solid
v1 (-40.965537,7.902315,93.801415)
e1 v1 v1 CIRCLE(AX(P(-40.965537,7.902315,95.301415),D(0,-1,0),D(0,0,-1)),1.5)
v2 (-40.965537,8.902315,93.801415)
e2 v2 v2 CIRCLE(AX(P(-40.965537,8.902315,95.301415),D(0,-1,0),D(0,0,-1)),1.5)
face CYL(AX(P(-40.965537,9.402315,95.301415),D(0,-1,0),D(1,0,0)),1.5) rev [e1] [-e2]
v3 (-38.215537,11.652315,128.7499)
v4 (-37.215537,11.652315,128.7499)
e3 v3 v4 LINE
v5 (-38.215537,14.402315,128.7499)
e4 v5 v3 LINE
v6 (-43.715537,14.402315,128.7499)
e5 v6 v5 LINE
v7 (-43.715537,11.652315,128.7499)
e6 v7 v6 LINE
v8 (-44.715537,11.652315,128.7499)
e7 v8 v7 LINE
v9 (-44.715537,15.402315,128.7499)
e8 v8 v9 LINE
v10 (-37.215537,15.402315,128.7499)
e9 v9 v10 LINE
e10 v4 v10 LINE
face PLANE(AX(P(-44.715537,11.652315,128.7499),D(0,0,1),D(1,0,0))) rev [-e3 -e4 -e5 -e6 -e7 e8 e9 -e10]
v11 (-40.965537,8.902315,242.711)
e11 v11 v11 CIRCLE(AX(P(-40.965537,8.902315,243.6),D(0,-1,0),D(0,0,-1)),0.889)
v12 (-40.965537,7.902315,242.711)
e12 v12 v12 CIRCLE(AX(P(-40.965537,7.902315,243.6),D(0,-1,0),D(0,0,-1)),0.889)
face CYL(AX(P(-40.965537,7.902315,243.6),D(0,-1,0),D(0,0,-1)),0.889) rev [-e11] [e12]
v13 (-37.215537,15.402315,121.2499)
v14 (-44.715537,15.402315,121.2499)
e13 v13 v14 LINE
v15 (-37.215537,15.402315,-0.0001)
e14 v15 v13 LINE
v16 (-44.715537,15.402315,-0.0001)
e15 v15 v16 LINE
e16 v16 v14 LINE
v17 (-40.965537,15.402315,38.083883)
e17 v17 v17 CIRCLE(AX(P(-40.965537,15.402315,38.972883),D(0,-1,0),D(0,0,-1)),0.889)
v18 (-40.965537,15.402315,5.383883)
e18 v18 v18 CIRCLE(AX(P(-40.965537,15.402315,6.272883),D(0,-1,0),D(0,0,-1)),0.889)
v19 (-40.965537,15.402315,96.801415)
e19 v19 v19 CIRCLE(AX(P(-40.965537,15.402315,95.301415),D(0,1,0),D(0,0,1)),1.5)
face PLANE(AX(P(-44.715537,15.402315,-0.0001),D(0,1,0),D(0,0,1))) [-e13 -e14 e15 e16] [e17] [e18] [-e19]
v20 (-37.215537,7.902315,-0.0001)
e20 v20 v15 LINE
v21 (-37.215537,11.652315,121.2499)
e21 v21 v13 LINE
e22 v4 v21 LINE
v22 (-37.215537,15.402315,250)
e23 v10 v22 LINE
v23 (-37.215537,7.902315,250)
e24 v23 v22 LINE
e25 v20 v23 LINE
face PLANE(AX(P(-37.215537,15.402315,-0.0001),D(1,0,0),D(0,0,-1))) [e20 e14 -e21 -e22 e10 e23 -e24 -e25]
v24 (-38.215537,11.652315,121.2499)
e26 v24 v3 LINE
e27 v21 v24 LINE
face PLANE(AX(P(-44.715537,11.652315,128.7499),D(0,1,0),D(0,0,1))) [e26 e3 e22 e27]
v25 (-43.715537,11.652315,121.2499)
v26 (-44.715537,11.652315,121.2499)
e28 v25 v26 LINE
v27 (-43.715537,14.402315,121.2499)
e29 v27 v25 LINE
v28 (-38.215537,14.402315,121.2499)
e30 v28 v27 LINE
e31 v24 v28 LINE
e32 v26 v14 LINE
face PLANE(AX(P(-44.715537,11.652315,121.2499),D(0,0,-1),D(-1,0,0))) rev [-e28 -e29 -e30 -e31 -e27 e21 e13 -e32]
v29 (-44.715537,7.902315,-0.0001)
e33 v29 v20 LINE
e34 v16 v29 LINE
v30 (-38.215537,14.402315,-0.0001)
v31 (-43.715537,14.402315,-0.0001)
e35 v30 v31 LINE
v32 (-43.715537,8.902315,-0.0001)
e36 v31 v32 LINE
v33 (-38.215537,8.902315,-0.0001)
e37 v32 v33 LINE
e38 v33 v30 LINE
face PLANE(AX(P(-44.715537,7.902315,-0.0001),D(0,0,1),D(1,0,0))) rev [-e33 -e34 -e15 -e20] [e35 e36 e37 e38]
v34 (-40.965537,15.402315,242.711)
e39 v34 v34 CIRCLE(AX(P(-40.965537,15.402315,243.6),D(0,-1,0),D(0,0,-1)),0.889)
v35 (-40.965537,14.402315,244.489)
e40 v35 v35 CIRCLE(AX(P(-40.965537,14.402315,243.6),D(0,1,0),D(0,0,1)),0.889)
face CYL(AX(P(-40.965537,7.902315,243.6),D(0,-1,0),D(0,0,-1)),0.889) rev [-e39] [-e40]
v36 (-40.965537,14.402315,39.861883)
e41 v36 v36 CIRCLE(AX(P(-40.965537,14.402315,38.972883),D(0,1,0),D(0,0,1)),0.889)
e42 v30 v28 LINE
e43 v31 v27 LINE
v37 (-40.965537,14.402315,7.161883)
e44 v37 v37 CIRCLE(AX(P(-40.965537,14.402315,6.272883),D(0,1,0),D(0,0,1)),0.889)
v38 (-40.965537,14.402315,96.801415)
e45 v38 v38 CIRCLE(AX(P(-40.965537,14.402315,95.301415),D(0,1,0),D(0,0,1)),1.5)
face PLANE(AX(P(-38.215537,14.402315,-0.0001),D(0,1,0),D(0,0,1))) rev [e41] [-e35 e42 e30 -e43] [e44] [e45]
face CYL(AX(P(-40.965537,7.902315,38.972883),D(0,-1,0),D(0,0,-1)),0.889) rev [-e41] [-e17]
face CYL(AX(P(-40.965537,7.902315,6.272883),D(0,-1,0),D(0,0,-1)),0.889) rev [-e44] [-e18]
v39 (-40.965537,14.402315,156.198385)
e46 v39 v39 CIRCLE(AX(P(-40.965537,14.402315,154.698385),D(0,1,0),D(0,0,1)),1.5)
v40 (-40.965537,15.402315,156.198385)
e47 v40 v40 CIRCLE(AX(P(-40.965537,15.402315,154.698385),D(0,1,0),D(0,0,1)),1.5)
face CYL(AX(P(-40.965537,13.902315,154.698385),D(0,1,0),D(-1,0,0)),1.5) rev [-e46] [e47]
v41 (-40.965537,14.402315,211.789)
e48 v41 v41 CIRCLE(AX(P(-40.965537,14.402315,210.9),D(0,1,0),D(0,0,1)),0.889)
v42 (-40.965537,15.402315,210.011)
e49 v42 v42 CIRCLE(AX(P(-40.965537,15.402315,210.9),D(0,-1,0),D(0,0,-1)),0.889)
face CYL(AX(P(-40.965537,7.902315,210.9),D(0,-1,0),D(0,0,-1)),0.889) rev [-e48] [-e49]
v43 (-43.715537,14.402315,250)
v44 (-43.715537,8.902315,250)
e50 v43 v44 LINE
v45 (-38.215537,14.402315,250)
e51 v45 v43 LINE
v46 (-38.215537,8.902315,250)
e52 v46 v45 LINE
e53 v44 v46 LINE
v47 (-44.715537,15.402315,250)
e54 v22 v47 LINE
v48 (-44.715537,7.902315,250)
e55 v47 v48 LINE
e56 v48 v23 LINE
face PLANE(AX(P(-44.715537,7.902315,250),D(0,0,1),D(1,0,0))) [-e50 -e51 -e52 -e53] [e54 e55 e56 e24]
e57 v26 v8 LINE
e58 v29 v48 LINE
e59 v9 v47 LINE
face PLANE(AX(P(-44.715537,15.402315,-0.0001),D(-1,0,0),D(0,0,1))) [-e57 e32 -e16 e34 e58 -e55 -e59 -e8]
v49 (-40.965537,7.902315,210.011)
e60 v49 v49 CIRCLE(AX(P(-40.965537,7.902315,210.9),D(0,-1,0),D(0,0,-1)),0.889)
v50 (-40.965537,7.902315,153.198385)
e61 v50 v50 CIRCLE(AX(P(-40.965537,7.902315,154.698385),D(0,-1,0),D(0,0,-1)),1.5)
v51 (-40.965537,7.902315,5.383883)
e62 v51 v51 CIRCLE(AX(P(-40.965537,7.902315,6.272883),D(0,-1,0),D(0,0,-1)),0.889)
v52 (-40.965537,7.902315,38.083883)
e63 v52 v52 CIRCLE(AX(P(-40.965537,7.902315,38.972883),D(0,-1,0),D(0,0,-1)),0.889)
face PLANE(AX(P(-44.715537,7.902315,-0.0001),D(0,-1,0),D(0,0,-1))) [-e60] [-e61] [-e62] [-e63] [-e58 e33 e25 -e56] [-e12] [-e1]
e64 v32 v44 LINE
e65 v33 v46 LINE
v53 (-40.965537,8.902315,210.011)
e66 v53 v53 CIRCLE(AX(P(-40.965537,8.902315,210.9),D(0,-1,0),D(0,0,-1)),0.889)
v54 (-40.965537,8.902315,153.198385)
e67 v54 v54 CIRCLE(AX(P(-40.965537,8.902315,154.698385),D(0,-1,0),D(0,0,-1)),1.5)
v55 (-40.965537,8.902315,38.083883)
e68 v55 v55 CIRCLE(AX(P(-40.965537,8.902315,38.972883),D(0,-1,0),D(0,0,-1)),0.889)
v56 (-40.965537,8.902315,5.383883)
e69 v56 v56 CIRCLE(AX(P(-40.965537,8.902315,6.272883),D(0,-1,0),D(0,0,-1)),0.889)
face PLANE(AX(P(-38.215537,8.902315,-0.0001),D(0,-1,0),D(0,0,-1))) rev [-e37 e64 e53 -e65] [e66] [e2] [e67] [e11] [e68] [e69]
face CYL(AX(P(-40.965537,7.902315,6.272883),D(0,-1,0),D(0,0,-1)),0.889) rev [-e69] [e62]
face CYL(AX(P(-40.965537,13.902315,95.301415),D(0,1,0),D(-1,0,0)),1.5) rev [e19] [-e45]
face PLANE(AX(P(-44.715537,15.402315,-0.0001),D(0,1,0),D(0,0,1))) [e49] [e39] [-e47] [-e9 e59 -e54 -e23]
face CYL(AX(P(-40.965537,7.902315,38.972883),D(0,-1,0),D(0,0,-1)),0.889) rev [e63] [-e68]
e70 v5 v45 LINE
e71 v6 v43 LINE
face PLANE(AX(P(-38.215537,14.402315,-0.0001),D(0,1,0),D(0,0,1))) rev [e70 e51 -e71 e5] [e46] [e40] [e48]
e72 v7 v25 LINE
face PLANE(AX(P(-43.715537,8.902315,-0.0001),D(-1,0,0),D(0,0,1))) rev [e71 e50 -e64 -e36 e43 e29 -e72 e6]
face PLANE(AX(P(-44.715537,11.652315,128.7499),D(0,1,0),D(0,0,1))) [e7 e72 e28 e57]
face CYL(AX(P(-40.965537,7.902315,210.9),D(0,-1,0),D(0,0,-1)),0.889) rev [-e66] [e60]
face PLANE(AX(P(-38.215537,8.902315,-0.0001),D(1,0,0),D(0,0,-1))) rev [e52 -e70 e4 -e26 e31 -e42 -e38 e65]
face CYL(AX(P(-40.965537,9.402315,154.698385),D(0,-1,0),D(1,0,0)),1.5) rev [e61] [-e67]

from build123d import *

# Parameters (mm, degrees)
BOSS_EXTRU_3_DEPTH      = 250
BOSS_EXTRU_3_DEPTH_BACK = 0.0001
ESQUISSE3_W             = 7.5
ESQUISSE3_H             = 7.5
ESQUISSE4_W             = 5.5
ESQUISSE4_H             = 5.5
ENL_V_MAT_EXTRU_3_DEPTH = 255.43419698
ESQUISSE6_W             = 7.5
ESQUISSE6_H             = 7.5
ENL_V_MAT_EXTRU_4_DEPTH = 3.75
TROU_TARAUD_2_561_D     = 1.778
TROU_TARAUD_2_562_D     = 1.778
PER_AGE1_START          = 14.402314812
PER_AGE1_OUTLINE_R      = 1.5
PER_AGE1_DEPTH          = 1
PER_AGE2_START          = 7.902314812
PER_AGE2_OUTLINE_R      = 1.5
PER_AGE2_DEPTH          = 1


# Read off the part's stored shape, not the designer's step: Perçage1, Perçage2
with BuildPart() as part:
    # Esquisse3 → Boss.-Extru.3 (new, two sides: drawn at the far end of the back side and taken through both)
    with BuildSketch(Plane.XY.offset(-BOSS_EXTRU_3_DEPTH_BACK)):
        with Locations((-40.965537472, 11.652314812)):
            Rectangle(ESQUISSE3_W, ESQUISSE3_H)
    extrude(amount=BOSS_EXTRU_3_DEPTH + BOSS_EXTRU_3_DEPTH_BACK)

    # Esquisse4 → Enlèv. mat.-Extru.3 (cut, through all)
    with BuildSketch(Plane.XY.offset(250)):
        with Locations((-40.965537472, 11.652314812)):
            Rectangle(ESQUISSE4_W, ESQUISSE4_H)
    extrude(amount=-ENL_V_MAT_EXTRU_3_DEPTH, mode=Mode.SUBTRACT)

    # Esquisse6 → Enlèv. mat.-Extru.4 (cut)
    with BuildSketch(Plane(origin=(0, 15.402314812, 0), x_dir=(-1, 0, 0), z_dir=(0, 1, 0))):
        with Locations((40.965537472, 124.9999)):
            Rectangle(ESQUISSE6_W, ESQUISSE6_H)
    extrude(amount=-ENL_V_MAT_EXTRU_4_DEPTH, mode=Mode.SUBTRACT)

    # Trou taraudé #2-561 (through all)
    with Locations(Plane.XZ.offset(-7.902314812)):
        with Locations((-40.965537472, 243.6), (-40.965537472, 210.9)):
            Hole(TROU_TARAUD_2_561_D / 2)

    # Trou taraudé #2-562 (through all)
    with Locations(Plane.XZ.offset(-7.902314812)):
        with Locations((-40.965537472, 38.972883346), (-40.965537472, 6.272883346)):
            Hole(TROU_TARAUD_2_562_D / 2)

    # Perçage1 outline → Perçage1 (cut)
    with BuildSketch(Plane(origin=(0, 0, 0), x_dir=(1, 0, 0), z_dir=(0, 1, 0)).offset(PER_AGE1_START)):
        with Locations((-40.965537472, -154.69838481)):
            Circle(PER_AGE1_OUTLINE_R)
        with Locations((-40.965537472, -95.30141519)):
            Circle(PER_AGE1_OUTLINE_R)
    extrude(amount=PER_AGE1_DEPTH, mode=Mode.SUBTRACT)

    # Perçage2 outline → Perçage2 (cut)
    with BuildSketch(Plane(origin=(0, 0, 0), x_dir=(1, 0, 0), z_dir=(0, 1, 0)).offset(PER_AGE2_START)):
        with Locations((-40.965537472, -154.69838481)):
            Circle(PER_AGE2_OUTLINE_R)
        with Locations((-40.965537472, -95.30141519)):
            Circle(PER_AGE2_OUTLINE_R)
    extrude(amount=PER_AGE2_DEPTH, mode=Mode.SUBTRACT)


solid = part.part
